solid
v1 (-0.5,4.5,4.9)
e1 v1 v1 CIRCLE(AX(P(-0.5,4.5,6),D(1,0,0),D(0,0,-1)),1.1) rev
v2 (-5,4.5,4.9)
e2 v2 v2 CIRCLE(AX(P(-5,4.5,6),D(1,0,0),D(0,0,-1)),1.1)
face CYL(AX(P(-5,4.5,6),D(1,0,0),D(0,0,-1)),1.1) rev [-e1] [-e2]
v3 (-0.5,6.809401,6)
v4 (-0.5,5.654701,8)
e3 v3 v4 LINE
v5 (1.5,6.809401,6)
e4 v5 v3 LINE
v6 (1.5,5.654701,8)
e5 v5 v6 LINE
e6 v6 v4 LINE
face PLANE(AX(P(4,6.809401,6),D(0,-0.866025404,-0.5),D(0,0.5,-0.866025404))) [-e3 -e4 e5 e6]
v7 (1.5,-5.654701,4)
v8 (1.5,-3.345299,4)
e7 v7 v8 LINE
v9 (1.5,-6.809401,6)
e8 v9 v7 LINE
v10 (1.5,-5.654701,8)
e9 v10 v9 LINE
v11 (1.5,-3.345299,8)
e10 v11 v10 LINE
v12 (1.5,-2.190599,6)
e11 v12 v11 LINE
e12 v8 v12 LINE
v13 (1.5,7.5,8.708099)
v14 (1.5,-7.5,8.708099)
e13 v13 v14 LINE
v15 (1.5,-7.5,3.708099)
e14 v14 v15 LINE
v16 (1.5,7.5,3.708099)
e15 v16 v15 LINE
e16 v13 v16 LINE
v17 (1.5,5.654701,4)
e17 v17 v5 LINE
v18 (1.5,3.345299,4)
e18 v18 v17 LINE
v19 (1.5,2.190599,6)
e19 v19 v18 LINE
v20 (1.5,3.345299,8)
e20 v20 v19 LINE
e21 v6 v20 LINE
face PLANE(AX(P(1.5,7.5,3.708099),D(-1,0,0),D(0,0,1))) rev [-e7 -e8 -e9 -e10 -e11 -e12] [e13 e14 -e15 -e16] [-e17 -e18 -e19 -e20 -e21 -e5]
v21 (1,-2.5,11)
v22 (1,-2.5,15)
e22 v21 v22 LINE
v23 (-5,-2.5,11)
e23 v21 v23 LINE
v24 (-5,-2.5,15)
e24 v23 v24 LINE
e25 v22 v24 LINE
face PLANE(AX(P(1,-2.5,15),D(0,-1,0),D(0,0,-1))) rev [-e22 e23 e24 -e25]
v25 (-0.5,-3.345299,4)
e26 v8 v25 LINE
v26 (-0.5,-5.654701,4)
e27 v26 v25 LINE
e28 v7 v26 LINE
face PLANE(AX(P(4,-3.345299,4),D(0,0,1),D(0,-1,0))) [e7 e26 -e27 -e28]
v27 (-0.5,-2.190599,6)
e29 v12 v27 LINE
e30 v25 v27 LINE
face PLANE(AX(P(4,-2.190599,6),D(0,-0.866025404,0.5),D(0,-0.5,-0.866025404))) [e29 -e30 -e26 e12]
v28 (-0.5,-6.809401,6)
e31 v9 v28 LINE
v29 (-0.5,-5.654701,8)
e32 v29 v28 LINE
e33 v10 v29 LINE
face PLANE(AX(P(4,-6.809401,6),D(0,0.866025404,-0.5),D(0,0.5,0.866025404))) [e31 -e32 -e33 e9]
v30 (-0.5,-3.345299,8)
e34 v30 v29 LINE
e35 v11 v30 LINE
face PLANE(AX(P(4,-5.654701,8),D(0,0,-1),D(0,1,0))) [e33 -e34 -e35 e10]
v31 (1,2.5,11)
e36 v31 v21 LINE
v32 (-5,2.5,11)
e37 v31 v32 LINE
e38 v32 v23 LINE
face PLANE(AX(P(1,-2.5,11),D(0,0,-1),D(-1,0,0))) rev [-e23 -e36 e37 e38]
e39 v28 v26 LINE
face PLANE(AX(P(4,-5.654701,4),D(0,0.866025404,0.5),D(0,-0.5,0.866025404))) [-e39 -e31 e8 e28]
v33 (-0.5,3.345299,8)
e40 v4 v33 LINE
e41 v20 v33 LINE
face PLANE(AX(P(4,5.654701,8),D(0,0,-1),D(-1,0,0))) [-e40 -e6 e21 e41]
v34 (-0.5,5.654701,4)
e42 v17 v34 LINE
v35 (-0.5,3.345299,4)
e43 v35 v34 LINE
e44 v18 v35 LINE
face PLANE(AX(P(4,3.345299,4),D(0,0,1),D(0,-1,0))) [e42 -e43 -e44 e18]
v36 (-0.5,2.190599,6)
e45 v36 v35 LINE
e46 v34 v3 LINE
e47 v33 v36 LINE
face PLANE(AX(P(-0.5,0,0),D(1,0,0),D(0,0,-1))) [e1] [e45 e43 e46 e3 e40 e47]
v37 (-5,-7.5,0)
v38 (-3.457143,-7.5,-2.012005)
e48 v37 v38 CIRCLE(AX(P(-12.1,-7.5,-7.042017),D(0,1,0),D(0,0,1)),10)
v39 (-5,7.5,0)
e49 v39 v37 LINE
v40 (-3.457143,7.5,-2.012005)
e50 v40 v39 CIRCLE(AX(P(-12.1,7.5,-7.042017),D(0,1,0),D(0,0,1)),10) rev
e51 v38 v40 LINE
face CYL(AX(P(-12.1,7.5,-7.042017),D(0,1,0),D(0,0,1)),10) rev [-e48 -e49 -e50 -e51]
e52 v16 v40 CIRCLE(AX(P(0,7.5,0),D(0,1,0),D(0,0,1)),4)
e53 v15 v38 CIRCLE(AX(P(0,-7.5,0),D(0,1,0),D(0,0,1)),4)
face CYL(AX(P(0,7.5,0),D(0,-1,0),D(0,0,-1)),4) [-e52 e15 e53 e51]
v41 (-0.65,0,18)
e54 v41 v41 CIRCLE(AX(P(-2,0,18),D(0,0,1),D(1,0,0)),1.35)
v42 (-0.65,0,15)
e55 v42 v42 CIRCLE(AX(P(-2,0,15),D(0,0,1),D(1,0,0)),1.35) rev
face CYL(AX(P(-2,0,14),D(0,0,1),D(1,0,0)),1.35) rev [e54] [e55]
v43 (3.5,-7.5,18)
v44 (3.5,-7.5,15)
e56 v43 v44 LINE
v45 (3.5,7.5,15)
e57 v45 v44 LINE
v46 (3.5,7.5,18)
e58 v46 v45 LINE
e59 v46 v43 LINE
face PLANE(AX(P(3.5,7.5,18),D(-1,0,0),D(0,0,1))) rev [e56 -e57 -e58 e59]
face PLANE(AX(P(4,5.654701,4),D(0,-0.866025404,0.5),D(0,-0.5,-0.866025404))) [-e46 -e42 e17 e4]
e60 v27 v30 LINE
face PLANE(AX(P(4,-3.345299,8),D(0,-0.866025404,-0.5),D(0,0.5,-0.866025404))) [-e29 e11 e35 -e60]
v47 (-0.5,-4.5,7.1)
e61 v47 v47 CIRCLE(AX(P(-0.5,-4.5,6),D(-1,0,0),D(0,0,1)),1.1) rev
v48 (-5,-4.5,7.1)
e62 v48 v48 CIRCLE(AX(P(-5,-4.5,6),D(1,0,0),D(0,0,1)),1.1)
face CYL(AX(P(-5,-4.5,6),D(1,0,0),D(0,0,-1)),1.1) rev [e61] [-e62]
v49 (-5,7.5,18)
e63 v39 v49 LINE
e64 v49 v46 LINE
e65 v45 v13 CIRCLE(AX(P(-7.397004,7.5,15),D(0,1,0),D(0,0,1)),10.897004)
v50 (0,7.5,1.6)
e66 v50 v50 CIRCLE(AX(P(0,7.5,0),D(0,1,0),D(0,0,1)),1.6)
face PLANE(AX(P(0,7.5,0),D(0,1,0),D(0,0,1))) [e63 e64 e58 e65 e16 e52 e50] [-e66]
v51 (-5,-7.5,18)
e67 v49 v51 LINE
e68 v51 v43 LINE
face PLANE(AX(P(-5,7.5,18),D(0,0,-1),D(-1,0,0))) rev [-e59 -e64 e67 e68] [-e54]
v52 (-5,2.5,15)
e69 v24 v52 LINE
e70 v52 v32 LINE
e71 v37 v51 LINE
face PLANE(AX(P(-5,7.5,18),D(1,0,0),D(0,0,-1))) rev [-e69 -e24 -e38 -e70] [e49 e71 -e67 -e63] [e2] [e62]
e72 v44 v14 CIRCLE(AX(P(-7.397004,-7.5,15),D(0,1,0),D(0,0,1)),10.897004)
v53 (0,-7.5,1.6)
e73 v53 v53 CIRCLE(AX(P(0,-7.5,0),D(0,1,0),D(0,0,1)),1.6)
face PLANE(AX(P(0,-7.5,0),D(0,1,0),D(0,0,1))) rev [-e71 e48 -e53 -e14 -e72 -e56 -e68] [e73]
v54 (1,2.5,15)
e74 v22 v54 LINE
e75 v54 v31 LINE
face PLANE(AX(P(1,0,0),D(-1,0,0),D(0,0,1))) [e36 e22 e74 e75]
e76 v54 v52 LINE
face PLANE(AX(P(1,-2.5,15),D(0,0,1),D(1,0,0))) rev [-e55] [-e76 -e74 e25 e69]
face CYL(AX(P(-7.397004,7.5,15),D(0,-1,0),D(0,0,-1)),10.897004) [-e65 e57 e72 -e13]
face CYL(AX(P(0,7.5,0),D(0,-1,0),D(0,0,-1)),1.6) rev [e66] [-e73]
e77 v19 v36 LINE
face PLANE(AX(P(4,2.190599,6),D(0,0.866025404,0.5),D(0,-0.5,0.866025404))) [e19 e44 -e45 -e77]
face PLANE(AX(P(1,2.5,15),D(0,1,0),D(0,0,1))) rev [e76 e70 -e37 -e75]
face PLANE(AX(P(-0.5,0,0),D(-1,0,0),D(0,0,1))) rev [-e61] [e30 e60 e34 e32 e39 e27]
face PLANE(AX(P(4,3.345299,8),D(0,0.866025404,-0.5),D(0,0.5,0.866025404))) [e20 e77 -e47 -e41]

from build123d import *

# Parameters (mm, degrees)
SKETCH_1_R               = 1.6
EXTRUDE_1_DEPTH          = 7.5
CUT_EXTRUDE_1_DEPTH      = 21.554804791
CUT_EXTRUDE_1_DEPTH_BACK = 21.554804791
SKETCH_3_R               = 1.1
FILLET_1_R               = 10
SKETCH_6_R               = 1.35
CUT_EXTRUDE_2_DEPTH      = 4
SKETCH_7_W               = 4
SKETCH_7_H               = 5
CUT_EXTRUDE_3_DEPTH      = 6
CUT_EXTRUDE_4_DEPTH      = 21.554804791
CUT_EXTRUDE_4_DEPTH_BACK = 2


with BuildPart() as part:
    # 草图1 → 凸台-拉伸1 (new, symmetric)
    with BuildSketch(Plane(origin=(0, 0, 0), x_dir=(1, 0, 0), z_dir=(0, 1, 0))):
        with BuildLine():
            Line((-5, -18), (3.5, -18))
            Line((3.5, -18), (3.5, -15))
            ThreePointArc((3.5, -15), (2.987970346, -11.698938991), (1.5, -8.708099244))
            Line((1.5, -8.708099244), (1.5, -3.708099244))
            ThreePointArc((1.5, -3.708099244), (2.236067977, 3.31662479), (-4, 0))
            Line((-4, 0), (-5, 0))
            Line((-5, 0), (-5, -18))
        make_face()
        with Locations(Location((0, 0, 0), (0, 0, 270))):
            Circle(SKETCH_1_R, mode=Mode.SUBTRACT)
    extrude(amount=EXTRUDE_1_DEPTH, both=True)

    # 草图3 → 切除-拉伸1 (cut, two sides: drawn at the far end of the back side and taken through both)
    with BuildSketch(Plane(origin=(1.5, 0, 0), x_dir=(0, 0, -1), z_dir=(1, 0, 0)).offset(-CUT_EXTRUDE_1_DEPTH_BACK)):
        with Locations((-6, 4.5)):
            Circle(SKETCH_3_R)
        with Locations(Location((-6, -4.5, 0), (0, 0, 180))):
            Circle(SKETCH_3_R)
    extrude(amount=CUT_EXTRUDE_1_DEPTH + CUT_EXTRUDE_1_DEPTH_BACK, mode=Mode.SUBTRACT)

    # 圆角1
    # the kernel refuses this fillet: 10 mm, written as the material it adds along each edge
    with BuildSketch(Plane(origin=(-4, 7.5, 0), x_dir=(-1, 0, 0), z_dir=(0, -1, 0))) as fillet_1_piece_1:
        with BuildLine():
            CenterArc((8.1, 7.042016757), FILLET_1_R, 210.198757023, 14.566327648)
            Line((-0.542857143, 2.012004788), (-0.715714286, 1.911404548))
            ThreePointArc((-0.715714286, 1.911404548), (-0.331193265, 0.989877337), (-0.2, 0))
            Line((-0.2, 0), (0, -0.2))
            ThreePointArc((0, -0.2), (0.5, -0.2), (0.858, -0.140840335))
            Line((0.858, -0.140840335), (1, 0))
        make_face()
    extrude(amount=15)

    # 草图6 → 切除-拉伸2 (cut)
    with BuildSketch(Plane.XY.offset(18)):
        with Locations((-2, 0)):
            Circle(SKETCH_6_R)
    extrude(amount=-CUT_EXTRUDE_2_DEPTH, mode=Mode.SUBTRACT)

    # 草图7 → 切除-拉伸3 (cut)
    with BuildSketch(Plane.ZY.offset(5)):
        with Locations((13, 0)):
            Rectangle(SKETCH_7_W, SKETCH_7_H)
    extrude(amount=-CUT_EXTRUDE_3_DEPTH, mode=Mode.SUBTRACT)

    # 草图8 → 切除-拉伸4 (cut, two sides: drawn at the far end of the back side and taken through both)
    with BuildSketch(Plane(origin=(1.5, 0, 0), x_dir=(0, 0, -1), z_dir=(1, 0, 0)).offset(-CUT_EXTRUDE_4_DEPTH_BACK)):
        Polygon((-8, 5.654700538), (-8, 3.345299462), (-6, 2.190598923), (-4, 3.345299462), (-4, 5.654700538), (-6, 6.809401077), align=None)
        Polygon((-6, -6.809401077), (-8, -5.654700538), (-8, -3.345299462), (-6, -2.190598923), (-4, -3.345299462), (-4, -5.654700538), align=None)
    extrude(amount=CUT_EXTRUDE_4_DEPTH + CUT_EXTRUDE_4_DEPTH_BACK, mode=Mode.SUBTRACT)


solid = part.part
